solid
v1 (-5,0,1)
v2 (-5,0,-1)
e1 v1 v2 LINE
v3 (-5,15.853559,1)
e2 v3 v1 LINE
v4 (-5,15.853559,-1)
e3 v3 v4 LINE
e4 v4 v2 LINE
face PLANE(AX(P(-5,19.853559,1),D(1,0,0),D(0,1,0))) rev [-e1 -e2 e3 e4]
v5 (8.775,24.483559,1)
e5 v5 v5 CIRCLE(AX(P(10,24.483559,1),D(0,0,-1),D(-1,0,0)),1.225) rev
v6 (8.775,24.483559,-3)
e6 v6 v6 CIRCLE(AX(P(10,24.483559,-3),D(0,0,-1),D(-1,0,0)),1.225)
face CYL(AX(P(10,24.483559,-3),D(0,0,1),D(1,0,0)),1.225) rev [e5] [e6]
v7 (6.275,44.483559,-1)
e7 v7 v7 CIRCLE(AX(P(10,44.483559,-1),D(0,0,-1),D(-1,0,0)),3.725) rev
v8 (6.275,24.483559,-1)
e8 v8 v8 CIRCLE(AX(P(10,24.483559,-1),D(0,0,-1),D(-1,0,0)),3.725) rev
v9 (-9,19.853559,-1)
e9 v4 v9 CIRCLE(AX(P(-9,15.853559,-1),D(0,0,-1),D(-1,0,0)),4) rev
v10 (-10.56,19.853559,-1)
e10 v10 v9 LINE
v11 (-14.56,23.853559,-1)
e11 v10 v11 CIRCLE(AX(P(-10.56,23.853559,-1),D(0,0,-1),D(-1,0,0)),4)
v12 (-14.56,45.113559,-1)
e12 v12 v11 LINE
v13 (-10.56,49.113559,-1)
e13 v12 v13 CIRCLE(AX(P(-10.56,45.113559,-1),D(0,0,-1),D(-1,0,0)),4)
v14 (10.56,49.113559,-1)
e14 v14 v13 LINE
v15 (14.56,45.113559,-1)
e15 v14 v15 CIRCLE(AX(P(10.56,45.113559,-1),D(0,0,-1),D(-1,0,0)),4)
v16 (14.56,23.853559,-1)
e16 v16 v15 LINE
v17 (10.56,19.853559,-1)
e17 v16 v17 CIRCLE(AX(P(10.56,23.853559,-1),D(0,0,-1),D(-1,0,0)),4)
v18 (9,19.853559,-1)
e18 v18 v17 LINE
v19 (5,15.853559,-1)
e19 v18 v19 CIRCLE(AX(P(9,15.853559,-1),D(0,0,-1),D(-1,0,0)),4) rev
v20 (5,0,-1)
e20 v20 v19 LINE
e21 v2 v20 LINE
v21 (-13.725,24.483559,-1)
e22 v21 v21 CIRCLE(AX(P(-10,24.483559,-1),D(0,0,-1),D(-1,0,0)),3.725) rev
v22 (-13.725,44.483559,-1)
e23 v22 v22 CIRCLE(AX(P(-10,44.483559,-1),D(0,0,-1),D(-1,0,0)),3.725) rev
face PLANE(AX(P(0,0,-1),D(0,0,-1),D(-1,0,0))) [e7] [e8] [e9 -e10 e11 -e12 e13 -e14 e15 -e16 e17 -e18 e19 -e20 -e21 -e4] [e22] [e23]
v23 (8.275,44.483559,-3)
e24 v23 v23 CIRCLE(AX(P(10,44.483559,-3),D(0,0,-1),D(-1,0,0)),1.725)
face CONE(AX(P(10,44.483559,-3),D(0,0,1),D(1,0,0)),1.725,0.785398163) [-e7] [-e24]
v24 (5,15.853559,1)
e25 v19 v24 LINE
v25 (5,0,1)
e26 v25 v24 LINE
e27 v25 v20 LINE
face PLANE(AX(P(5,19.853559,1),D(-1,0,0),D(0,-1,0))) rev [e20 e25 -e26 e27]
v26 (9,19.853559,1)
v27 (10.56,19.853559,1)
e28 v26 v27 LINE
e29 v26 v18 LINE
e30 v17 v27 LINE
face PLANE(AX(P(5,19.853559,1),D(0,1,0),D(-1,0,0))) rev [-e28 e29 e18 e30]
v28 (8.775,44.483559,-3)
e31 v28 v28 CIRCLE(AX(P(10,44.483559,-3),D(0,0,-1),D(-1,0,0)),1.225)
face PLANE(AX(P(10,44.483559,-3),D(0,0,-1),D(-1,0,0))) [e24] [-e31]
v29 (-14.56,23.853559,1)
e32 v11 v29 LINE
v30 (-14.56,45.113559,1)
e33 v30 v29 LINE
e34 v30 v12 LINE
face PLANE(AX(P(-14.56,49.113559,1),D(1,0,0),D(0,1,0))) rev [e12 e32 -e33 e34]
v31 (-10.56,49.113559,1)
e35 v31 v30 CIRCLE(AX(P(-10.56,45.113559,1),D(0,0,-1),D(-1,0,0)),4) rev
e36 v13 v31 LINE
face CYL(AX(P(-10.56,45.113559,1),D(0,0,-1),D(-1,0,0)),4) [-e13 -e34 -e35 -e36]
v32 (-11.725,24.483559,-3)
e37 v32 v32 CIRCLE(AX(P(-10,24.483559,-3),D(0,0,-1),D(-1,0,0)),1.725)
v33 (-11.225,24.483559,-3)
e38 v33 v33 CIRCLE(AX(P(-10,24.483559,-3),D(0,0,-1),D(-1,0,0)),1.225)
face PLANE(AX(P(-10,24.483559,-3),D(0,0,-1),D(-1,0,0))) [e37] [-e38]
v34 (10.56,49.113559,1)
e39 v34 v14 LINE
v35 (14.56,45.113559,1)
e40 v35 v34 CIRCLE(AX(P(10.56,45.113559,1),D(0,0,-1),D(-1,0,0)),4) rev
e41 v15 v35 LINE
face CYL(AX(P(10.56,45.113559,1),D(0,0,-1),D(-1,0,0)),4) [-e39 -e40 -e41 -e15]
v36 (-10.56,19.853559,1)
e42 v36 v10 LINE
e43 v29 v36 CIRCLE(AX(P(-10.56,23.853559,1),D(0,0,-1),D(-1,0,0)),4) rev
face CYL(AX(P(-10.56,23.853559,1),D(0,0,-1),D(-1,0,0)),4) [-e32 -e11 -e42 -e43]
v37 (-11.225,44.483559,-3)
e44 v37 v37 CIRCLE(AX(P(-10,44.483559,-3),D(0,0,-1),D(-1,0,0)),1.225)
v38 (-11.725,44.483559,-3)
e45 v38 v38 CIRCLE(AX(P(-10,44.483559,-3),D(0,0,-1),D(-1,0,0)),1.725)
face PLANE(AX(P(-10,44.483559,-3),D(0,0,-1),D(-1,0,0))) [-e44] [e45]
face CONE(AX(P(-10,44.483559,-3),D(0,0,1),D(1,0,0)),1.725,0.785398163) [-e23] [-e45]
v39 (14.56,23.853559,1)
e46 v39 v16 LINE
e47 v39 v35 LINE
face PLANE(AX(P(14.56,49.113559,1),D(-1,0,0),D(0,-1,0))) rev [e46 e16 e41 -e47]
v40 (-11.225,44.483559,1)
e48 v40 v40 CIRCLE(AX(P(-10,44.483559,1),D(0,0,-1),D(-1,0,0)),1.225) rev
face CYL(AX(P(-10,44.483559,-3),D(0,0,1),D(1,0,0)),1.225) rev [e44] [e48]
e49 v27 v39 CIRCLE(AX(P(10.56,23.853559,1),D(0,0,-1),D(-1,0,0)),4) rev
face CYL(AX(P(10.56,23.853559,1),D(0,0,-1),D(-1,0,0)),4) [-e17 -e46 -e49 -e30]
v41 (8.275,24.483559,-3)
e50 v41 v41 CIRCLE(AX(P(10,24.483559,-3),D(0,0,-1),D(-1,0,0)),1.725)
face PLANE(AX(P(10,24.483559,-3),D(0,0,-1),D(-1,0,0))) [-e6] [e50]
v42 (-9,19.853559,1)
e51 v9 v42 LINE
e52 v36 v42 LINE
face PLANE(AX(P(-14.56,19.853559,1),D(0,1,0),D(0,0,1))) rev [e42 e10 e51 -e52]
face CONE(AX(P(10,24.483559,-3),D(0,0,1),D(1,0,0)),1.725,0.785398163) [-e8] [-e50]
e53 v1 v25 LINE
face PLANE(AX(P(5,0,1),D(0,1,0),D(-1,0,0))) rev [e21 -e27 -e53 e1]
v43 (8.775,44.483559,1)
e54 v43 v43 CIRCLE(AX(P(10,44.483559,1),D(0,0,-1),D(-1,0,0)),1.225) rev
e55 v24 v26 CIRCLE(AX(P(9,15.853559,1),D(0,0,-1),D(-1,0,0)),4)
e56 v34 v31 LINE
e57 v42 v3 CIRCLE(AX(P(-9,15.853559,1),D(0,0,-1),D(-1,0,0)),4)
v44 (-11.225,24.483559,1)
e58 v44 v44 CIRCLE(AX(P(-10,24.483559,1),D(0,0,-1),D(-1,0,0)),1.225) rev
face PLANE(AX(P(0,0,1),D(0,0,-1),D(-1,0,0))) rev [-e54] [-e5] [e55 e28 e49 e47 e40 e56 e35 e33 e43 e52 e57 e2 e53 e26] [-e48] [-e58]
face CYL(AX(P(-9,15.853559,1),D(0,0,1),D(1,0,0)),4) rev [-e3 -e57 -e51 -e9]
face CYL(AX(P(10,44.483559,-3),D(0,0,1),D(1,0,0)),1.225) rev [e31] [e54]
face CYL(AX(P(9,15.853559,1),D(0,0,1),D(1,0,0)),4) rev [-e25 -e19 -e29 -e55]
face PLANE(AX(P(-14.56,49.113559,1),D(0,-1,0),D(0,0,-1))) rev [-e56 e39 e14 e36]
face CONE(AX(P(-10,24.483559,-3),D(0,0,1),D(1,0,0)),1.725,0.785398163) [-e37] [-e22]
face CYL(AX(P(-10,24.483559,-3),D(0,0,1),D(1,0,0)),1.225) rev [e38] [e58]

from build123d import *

# Parameters (mm, degrees)
BOSS_EXTRUDE1_DEPTH = 1
SKETCH4_R           = 1.725
SKETCH4_R_2         = 1.225
BOSS_EXTRUDE2_DEPTH = 2
CHAMFER1_SIZE       = 2
FILLET1_R           = 4
CUT_EXTRUDE1_REACH  = 53.265
SKETCH4_2_R         = 1.225


with BuildPart() as part:
    # Sketch3 → Boss-Extrude1 (new, symmetric)
    with BuildSketch(Plane.XY):
        Polygon((5, 19.853558876), (14.56, 19.853558876), (14.56, 49.113558876), (-14.56, 49.113558876), (-14.56, 19.853558876), (-5, 19.853558876), (-5, 0), (5, 0), align=None)
    extrude(amount=BOSS_EXTRUDE1_DEPTH, both=True)

    # Sketch4 → Boss-Extrude2 (add)
    # profile 1 of 4: a face of its own
    with BuildSketch(Plane(origin=(0, 0, -1), x_dir=(-1, 0, 0), z_dir=(0, 0, -1))):
        with Locations((-10, 44.483558876)):
            Circle(SKETCH4_R)
        with Locations((-10, 44.483558876)):
            Circle(SKETCH4_R_2, mode=Mode.SUBTRACT)
    # profile 2 of 4: a face of its own
    with BuildSketch(Plane(origin=(0, 0, -1), x_dir=(-1, 0, 0), z_dir=(0, 0, -1))):
        with Locations((10, 44.483558876)):
            Circle(SKETCH4_R)
        with Locations((10, 44.483558876)):
            Circle(SKETCH4_R_2, mode=Mode.SUBTRACT)
    # profile 3 of 4: a face of its own
    with BuildSketch(Plane(origin=(0, 0, -1), x_dir=(-1, 0, 0), z_dir=(0, 0, -1))):
        with Locations((-10, 24.483558876)):
            Circle(SKETCH4_R)
        with Locations((-10, 24.483558876)):
            Circle(SKETCH4_R_2, mode=Mode.SUBTRACT)
    # profile 4 of 4: a face of its own
    with BuildSketch(Plane(origin=(0, 0, -1), x_dir=(-1, 0, 0), z_dir=(0, 0, -1))):
        with Locations((10, 24.483558876)):
            Circle(SKETCH4_R)
        with Locations((10, 24.483558876)):
            Circle(SKETCH4_R_2, mode=Mode.SUBTRACT)
    extrude(amount=BOSS_EXTRUDE2_DEPTH)

    # Chamfer1
    chamfer1_edges = [part.edges().sort_by_distance(p)[0] for p in [
        (11.725, 44.483558876, -1),
        (-8.275, 44.483558876, -1),
        (11.725, 24.483558876, -1),
        (-8.275, 24.483558876, -1),
    ]]
    chamfer(chamfer1_edges, length=CHAMFER1_SIZE - 0.0001)  # a hair under: the kernel refuses the full size

    # Fillet1
    fillet1_edges = [part.edges().sort_by_distance(p)[0] for p in [
        (-5, 19.853558876, 0),
        (-14.56, 19.853558876, 0),
        (-14.56, 49.113558876, 0),
        (14.56, 49.113558876, 0),
        (14.56, 19.853558876, 0),
        (5, 19.853558876, 0),
    ]]
    fillet(fillet1_edges, radius=FILLET1_R)

    # Sketch4<2> → Cut-Extrude1 (cut, up to next)
    with BuildSketch(Plane(origin=(0, 0, -1), x_dir=(-1, 0, 0), z_dir=(0, 0, -1)), mode=Mode.PRIVATE) as cut_extrude1_sk1:
        with Locations((-10, 44.483558876)):
            Circle(SKETCH4_2_R)
    cut_extrude1_tool1 = extrude(cut_extrude1_sk1.sketch, amount=-CUT_EXTRUDE1_REACH, mode=Mode.PRIVATE) & part.part
    # Sketch4<2> → Cut-Extrude1 (cut, up to next)
    with BuildSketch(Plane(origin=(0, 0, -1), x_dir=(-1, 0, 0), z_dir=(0, 0, -1)), mode=Mode.PRIVATE) as cut_extrude1_sk2:
        with Locations((10, 44.483558876)):
            Circle(SKETCH4_2_R)
    cut_extrude1_tool2 = extrude(cut_extrude1_sk2.sketch, amount=-CUT_EXTRUDE1_REACH, mode=Mode.PRIVATE) & part.part
    # Sketch4<2> → Cut-Extrude1 (cut, up to next)
    with BuildSketch(Plane(origin=(0, 0, -1), x_dir=(-1, 0, 0), z_dir=(0, 0, -1)), mode=Mode.PRIVATE) as cut_extrude1_sk3:
        with Locations((10, 24.483558876)):
            Circle(SKETCH4_2_R)
    cut_extrude1_tool3 = extrude(cut_extrude1_sk3.sketch, amount=-CUT_EXTRUDE1_REACH, mode=Mode.PRIVATE) & part.part
    # Sketch4<2> → Cut-Extrude1 (cut, up to next)
    with BuildSketch(Plane(origin=(0, 0, -1), x_dir=(-1, 0, 0), z_dir=(0, 0, -1)), mode=Mode.PRIVATE) as cut_extrude1_sk4:
        with Locations((-10, 24.483558876)):
            Circle(SKETCH4_2_R)
    cut_extrude1_tool4 = extrude(cut_extrude1_sk4.sketch, amount=-CUT_EXTRUDE1_REACH, mode=Mode.PRIVATE) & part.part
    add(cut_extrude1_tool1.solids().sort_by_distance((10, 44.483559, -1))[0], mode=Mode.SUBTRACT)
    add(cut_extrude1_tool2.solids().sort_by_distance((-10, 44.483559, -1))[0], mode=Mode.SUBTRACT)
    add(cut_extrude1_tool3.solids().sort_by_distance((-10, 24.483559, -1))[0], mode=Mode.SUBTRACT)
    add(cut_extrude1_tool4.solids().sort_by_distance((10, 24.483559, -1))[0], mode=Mode.SUBTRACT)


solid = part.part
